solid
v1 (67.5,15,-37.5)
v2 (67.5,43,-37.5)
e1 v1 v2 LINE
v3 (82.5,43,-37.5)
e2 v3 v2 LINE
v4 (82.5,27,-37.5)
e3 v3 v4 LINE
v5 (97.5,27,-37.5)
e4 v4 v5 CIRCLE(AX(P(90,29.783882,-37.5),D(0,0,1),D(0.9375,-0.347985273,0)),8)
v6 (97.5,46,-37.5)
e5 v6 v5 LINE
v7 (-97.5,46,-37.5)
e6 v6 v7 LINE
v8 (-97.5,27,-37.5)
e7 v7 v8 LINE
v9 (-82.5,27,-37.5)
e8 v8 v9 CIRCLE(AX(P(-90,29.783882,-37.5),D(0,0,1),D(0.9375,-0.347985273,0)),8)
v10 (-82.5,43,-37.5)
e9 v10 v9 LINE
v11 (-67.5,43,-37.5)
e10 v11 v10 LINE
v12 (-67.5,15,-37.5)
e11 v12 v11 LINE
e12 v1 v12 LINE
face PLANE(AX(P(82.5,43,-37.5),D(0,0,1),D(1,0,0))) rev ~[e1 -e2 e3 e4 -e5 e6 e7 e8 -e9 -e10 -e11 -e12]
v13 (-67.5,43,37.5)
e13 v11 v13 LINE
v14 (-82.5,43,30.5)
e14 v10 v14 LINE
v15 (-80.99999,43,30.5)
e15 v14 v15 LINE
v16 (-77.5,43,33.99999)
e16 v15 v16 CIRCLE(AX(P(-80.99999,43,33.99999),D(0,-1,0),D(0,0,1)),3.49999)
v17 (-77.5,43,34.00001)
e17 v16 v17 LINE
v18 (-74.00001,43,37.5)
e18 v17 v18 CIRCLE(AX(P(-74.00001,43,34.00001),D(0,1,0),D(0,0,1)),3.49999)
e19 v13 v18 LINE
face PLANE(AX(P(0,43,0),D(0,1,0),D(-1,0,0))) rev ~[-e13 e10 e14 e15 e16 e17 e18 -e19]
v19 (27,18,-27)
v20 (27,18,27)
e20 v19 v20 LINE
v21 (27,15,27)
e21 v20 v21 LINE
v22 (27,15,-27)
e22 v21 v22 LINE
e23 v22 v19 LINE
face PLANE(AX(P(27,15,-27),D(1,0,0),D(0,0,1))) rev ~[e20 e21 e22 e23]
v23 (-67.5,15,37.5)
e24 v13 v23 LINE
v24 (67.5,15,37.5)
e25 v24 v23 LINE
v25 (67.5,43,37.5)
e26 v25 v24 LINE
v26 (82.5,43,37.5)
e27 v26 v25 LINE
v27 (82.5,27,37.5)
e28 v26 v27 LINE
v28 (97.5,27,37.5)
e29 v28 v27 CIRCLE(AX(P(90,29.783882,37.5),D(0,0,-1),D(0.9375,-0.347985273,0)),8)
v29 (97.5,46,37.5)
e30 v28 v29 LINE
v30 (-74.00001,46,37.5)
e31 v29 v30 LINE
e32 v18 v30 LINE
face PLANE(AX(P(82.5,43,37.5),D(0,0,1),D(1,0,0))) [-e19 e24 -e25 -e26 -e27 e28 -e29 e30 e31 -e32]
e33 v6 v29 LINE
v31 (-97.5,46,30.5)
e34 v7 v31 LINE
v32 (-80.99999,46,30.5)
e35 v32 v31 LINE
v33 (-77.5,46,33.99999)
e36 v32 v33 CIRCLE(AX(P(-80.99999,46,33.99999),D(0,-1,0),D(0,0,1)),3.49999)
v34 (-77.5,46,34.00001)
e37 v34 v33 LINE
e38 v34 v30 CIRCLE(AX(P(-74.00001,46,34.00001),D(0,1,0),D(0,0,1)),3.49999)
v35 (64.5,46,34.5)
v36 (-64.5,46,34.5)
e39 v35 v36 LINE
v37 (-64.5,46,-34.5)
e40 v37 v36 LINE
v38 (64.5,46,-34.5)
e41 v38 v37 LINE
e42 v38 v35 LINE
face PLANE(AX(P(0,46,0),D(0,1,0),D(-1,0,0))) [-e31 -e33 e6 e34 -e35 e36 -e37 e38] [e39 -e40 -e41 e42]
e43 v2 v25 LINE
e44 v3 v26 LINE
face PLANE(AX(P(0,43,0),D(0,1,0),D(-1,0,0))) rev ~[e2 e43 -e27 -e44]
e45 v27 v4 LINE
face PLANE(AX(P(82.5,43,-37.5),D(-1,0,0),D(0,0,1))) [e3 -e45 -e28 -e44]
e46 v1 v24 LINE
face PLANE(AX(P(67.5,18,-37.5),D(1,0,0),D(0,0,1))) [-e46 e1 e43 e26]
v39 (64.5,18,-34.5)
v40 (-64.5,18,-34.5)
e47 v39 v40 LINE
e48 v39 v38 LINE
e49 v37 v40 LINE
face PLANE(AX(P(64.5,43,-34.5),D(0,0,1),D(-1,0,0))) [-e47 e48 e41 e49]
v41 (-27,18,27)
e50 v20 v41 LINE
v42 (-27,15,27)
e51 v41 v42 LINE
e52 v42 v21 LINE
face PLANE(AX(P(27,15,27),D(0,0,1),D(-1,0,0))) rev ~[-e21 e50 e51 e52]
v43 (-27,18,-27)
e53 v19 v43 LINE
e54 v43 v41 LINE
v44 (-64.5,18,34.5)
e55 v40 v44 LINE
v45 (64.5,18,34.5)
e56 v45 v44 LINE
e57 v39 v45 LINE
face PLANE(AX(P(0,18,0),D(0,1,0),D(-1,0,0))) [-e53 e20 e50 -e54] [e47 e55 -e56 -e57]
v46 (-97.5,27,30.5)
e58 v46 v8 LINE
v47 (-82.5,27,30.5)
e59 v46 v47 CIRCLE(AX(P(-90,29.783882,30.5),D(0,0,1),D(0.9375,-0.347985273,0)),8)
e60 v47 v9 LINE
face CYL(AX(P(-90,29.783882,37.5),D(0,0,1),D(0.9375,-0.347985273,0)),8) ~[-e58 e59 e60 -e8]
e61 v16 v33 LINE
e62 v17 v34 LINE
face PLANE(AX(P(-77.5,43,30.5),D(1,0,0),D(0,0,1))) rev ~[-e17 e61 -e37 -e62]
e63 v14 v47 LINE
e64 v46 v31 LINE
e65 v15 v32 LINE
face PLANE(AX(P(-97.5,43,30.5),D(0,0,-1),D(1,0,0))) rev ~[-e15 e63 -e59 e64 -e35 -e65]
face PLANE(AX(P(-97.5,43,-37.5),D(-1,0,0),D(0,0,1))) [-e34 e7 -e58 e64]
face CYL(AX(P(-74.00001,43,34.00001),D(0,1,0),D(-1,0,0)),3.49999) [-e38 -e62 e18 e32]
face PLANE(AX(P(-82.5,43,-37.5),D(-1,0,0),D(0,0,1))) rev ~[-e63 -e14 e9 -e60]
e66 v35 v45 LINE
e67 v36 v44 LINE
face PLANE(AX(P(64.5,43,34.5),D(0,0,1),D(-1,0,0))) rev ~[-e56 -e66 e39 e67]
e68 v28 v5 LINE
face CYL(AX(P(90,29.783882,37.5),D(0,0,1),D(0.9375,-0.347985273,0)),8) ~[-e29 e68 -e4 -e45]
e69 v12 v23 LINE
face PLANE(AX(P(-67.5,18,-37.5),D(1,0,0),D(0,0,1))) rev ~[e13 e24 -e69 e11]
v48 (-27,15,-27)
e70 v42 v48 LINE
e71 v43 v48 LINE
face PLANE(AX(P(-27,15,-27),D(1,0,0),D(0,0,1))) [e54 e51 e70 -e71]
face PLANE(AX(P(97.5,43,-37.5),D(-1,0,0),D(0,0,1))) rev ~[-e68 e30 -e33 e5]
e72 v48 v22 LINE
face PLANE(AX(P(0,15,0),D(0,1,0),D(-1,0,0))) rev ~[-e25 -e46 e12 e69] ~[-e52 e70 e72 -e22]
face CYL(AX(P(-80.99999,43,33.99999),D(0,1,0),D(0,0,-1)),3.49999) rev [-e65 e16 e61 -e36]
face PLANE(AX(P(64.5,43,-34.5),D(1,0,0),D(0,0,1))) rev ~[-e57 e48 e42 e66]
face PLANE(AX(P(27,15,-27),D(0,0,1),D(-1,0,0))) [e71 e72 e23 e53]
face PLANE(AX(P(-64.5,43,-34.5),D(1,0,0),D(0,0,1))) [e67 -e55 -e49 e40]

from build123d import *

# Parameters (mm, degrees)
F0_W      = 60
F0_H      = 60
F0_R      = 22.4096796893
F1_DEPTH  = 3
F2_W      = 60
F2_H      = 60
F2_W_2    = 54
F2_H_2    = 54
F3_DEPTH  = 15
F4_W      = 135
F4_H      = 75
F4_W_2    = 54
F4_H_2    = 54
F5_DEPTH  = 3
F6_W      = 135
F6_H      = 75
F6_W_2    = 129
F6_H_2    = 69
F7_DEPTH  = 25
F8_W      = 195
F8_H      = 75
F8_W_2    = 129
F8_H_2    = 69
F9_DEPTH  = 3
F10_W     = 15
F10_H     = 68
F11_DEPTH = 25
F12_W     = 15
F12_H     = 75
F13_DEPTH = 25
F15_DEPTH = 200
F17_DEPTH = 25
F18_R     = 3.49999
F21_DEPTH = 60
F24_W     = 60
F24_H     = 60
F25_DEPTH = 18


# Not quite as in the source:
# - a fillet or chamfer is up to 0.001 mm smaller than in the source, because OpenCascade refuses the exact size


with BuildPart() as f1:
    # F0 (on Front) → F1 (new body)
    with BuildSketch(Plane.XZ):
        Rectangle(F0_W, F0_H)
        Circle(F0_R, mode=Mode.SUBTRACT)
    extrude(amount=F1_DEPTH)

    # F2 (on face) → F3 (join)
    with BuildSketch(Plane(origin=(0, 0, 0), x_dir=(-1, 0, 0), z_dir=(0, 1, 0))):
        Rectangle(F2_W, F2_H)
        Rectangle(F2_W_2, F2_H_2, mode=Mode.SUBTRACT)
    extrude(amount=F3_DEPTH)

    # F4 (on face) → F5 (join)
    with BuildSketch(Plane(origin=(0, 15, 0), x_dir=(-1, 0, 0), z_dir=(0, 1, 0))):
        Rectangle(F4_W, F4_H)
        Rectangle(F4_W_2, F4_H_2, mode=Mode.SUBTRACT)
    extrude(amount=F5_DEPTH)

    # F6 (on face) → F7 (join)
    with BuildSketch(Plane(origin=(0, 18, 0), x_dir=(-1, 0, 0), z_dir=(0, 1, 0))):
        Rectangle(F6_W, F6_H)
        Rectangle(F6_W_2, F6_H_2, mode=Mode.SUBTRACT)
    extrude(amount=F7_DEPTH)

    # F8 (on face) → F9 (join)
    with BuildSketch(Plane(origin=(0, 43, 0), x_dir=(-1, 0, 0), z_dir=(0, 1, 0))):
        Rectangle(F8_W, F8_H)
        Rectangle(F8_W_2, F8_H_2, mode=Mode.SUBTRACT)
    extrude(amount=F9_DEPTH)

    # F10 (on face) → F11 (join)
    with BuildSketch(Plane.XZ.offset(-43)):
        with Locations((-90, -3.5)):
            Rectangle(F10_W, F10_H)
    extrude(amount=F11_DEPTH)

    # F12 (on face) → F13 (join)
    with BuildSketch(Plane.XZ.offset(-43)):
        with Locations((90, 0)):
            Rectangle(F12_W, F12_H)
    extrude(amount=F13_DEPTH)

    # F14 (on face) → F15 (cut)
    with BuildSketch(Plane.XY.offset(37.5)):
        with BuildLine():
            ThreePointArc((-82.5, 27), (-90, 21.7838821814), (-97.5, 27))
            Line((-97.5, 27), (-97.5, 18))
            Line((-97.5, 18), (-82.5, 18))
            Line((-82.5, 18), (-82.5, 27))
        make_face()
        with BuildLine():
            ThreePointArc((97.5, 27), (90, 21.7838821814), (82.5, 27))
            Line((82.5, 27), (82.5, 18))
            Line((82.5, 18), (97.5, 18))
            Line((97.5, 18), (97.5, 27))
        make_face()
    extrude(amount=-F15_DEPTH, mode=Mode.SUBTRACT)

    # F16 (on face) → F17 (cut)
    with BuildSketch(Plane.XZ.offset(-43)):
        Polygon((-77.5, 37.5), (-82.5, 37.5), (-97.5, 37.5), (-97.5, 30.5), (-82.5, 30.5), (-77.5, 30.5), align=None)
    extrude(amount=-F17_DEPTH, mode=Mode.SUBTRACT)

    # F18 (radius 3.5 in the source; OpenCascade refuses exactly that, so slightly less here)
    f18_edges = [f1.edges().sort_by_distance(p)[0] for p in [
        (-77.5, 44.5, 30.5),
        (-77.5, 44.5, 37.5),
    ]]
    fillet(f18_edges, radius=F18_R)

    # F20 (on face) → F21 (cut)
    with BuildSketch(Plane.XY.offset(30)):
        Polygon((-30, -3), (-50, 15), (-50, -3), align=None)
    extrude(amount=-F21_DEPTH, mode=Mode.SUBTRACT)

    # F24 (on face) → F25 (cut)
    with BuildSketch(Plane.XZ.offset(3)):
        Rectangle(F24_W, F24_H)
    extrude(amount=-F25_DEPTH, mode=Mode.SUBTRACT)


solid = f1.part
